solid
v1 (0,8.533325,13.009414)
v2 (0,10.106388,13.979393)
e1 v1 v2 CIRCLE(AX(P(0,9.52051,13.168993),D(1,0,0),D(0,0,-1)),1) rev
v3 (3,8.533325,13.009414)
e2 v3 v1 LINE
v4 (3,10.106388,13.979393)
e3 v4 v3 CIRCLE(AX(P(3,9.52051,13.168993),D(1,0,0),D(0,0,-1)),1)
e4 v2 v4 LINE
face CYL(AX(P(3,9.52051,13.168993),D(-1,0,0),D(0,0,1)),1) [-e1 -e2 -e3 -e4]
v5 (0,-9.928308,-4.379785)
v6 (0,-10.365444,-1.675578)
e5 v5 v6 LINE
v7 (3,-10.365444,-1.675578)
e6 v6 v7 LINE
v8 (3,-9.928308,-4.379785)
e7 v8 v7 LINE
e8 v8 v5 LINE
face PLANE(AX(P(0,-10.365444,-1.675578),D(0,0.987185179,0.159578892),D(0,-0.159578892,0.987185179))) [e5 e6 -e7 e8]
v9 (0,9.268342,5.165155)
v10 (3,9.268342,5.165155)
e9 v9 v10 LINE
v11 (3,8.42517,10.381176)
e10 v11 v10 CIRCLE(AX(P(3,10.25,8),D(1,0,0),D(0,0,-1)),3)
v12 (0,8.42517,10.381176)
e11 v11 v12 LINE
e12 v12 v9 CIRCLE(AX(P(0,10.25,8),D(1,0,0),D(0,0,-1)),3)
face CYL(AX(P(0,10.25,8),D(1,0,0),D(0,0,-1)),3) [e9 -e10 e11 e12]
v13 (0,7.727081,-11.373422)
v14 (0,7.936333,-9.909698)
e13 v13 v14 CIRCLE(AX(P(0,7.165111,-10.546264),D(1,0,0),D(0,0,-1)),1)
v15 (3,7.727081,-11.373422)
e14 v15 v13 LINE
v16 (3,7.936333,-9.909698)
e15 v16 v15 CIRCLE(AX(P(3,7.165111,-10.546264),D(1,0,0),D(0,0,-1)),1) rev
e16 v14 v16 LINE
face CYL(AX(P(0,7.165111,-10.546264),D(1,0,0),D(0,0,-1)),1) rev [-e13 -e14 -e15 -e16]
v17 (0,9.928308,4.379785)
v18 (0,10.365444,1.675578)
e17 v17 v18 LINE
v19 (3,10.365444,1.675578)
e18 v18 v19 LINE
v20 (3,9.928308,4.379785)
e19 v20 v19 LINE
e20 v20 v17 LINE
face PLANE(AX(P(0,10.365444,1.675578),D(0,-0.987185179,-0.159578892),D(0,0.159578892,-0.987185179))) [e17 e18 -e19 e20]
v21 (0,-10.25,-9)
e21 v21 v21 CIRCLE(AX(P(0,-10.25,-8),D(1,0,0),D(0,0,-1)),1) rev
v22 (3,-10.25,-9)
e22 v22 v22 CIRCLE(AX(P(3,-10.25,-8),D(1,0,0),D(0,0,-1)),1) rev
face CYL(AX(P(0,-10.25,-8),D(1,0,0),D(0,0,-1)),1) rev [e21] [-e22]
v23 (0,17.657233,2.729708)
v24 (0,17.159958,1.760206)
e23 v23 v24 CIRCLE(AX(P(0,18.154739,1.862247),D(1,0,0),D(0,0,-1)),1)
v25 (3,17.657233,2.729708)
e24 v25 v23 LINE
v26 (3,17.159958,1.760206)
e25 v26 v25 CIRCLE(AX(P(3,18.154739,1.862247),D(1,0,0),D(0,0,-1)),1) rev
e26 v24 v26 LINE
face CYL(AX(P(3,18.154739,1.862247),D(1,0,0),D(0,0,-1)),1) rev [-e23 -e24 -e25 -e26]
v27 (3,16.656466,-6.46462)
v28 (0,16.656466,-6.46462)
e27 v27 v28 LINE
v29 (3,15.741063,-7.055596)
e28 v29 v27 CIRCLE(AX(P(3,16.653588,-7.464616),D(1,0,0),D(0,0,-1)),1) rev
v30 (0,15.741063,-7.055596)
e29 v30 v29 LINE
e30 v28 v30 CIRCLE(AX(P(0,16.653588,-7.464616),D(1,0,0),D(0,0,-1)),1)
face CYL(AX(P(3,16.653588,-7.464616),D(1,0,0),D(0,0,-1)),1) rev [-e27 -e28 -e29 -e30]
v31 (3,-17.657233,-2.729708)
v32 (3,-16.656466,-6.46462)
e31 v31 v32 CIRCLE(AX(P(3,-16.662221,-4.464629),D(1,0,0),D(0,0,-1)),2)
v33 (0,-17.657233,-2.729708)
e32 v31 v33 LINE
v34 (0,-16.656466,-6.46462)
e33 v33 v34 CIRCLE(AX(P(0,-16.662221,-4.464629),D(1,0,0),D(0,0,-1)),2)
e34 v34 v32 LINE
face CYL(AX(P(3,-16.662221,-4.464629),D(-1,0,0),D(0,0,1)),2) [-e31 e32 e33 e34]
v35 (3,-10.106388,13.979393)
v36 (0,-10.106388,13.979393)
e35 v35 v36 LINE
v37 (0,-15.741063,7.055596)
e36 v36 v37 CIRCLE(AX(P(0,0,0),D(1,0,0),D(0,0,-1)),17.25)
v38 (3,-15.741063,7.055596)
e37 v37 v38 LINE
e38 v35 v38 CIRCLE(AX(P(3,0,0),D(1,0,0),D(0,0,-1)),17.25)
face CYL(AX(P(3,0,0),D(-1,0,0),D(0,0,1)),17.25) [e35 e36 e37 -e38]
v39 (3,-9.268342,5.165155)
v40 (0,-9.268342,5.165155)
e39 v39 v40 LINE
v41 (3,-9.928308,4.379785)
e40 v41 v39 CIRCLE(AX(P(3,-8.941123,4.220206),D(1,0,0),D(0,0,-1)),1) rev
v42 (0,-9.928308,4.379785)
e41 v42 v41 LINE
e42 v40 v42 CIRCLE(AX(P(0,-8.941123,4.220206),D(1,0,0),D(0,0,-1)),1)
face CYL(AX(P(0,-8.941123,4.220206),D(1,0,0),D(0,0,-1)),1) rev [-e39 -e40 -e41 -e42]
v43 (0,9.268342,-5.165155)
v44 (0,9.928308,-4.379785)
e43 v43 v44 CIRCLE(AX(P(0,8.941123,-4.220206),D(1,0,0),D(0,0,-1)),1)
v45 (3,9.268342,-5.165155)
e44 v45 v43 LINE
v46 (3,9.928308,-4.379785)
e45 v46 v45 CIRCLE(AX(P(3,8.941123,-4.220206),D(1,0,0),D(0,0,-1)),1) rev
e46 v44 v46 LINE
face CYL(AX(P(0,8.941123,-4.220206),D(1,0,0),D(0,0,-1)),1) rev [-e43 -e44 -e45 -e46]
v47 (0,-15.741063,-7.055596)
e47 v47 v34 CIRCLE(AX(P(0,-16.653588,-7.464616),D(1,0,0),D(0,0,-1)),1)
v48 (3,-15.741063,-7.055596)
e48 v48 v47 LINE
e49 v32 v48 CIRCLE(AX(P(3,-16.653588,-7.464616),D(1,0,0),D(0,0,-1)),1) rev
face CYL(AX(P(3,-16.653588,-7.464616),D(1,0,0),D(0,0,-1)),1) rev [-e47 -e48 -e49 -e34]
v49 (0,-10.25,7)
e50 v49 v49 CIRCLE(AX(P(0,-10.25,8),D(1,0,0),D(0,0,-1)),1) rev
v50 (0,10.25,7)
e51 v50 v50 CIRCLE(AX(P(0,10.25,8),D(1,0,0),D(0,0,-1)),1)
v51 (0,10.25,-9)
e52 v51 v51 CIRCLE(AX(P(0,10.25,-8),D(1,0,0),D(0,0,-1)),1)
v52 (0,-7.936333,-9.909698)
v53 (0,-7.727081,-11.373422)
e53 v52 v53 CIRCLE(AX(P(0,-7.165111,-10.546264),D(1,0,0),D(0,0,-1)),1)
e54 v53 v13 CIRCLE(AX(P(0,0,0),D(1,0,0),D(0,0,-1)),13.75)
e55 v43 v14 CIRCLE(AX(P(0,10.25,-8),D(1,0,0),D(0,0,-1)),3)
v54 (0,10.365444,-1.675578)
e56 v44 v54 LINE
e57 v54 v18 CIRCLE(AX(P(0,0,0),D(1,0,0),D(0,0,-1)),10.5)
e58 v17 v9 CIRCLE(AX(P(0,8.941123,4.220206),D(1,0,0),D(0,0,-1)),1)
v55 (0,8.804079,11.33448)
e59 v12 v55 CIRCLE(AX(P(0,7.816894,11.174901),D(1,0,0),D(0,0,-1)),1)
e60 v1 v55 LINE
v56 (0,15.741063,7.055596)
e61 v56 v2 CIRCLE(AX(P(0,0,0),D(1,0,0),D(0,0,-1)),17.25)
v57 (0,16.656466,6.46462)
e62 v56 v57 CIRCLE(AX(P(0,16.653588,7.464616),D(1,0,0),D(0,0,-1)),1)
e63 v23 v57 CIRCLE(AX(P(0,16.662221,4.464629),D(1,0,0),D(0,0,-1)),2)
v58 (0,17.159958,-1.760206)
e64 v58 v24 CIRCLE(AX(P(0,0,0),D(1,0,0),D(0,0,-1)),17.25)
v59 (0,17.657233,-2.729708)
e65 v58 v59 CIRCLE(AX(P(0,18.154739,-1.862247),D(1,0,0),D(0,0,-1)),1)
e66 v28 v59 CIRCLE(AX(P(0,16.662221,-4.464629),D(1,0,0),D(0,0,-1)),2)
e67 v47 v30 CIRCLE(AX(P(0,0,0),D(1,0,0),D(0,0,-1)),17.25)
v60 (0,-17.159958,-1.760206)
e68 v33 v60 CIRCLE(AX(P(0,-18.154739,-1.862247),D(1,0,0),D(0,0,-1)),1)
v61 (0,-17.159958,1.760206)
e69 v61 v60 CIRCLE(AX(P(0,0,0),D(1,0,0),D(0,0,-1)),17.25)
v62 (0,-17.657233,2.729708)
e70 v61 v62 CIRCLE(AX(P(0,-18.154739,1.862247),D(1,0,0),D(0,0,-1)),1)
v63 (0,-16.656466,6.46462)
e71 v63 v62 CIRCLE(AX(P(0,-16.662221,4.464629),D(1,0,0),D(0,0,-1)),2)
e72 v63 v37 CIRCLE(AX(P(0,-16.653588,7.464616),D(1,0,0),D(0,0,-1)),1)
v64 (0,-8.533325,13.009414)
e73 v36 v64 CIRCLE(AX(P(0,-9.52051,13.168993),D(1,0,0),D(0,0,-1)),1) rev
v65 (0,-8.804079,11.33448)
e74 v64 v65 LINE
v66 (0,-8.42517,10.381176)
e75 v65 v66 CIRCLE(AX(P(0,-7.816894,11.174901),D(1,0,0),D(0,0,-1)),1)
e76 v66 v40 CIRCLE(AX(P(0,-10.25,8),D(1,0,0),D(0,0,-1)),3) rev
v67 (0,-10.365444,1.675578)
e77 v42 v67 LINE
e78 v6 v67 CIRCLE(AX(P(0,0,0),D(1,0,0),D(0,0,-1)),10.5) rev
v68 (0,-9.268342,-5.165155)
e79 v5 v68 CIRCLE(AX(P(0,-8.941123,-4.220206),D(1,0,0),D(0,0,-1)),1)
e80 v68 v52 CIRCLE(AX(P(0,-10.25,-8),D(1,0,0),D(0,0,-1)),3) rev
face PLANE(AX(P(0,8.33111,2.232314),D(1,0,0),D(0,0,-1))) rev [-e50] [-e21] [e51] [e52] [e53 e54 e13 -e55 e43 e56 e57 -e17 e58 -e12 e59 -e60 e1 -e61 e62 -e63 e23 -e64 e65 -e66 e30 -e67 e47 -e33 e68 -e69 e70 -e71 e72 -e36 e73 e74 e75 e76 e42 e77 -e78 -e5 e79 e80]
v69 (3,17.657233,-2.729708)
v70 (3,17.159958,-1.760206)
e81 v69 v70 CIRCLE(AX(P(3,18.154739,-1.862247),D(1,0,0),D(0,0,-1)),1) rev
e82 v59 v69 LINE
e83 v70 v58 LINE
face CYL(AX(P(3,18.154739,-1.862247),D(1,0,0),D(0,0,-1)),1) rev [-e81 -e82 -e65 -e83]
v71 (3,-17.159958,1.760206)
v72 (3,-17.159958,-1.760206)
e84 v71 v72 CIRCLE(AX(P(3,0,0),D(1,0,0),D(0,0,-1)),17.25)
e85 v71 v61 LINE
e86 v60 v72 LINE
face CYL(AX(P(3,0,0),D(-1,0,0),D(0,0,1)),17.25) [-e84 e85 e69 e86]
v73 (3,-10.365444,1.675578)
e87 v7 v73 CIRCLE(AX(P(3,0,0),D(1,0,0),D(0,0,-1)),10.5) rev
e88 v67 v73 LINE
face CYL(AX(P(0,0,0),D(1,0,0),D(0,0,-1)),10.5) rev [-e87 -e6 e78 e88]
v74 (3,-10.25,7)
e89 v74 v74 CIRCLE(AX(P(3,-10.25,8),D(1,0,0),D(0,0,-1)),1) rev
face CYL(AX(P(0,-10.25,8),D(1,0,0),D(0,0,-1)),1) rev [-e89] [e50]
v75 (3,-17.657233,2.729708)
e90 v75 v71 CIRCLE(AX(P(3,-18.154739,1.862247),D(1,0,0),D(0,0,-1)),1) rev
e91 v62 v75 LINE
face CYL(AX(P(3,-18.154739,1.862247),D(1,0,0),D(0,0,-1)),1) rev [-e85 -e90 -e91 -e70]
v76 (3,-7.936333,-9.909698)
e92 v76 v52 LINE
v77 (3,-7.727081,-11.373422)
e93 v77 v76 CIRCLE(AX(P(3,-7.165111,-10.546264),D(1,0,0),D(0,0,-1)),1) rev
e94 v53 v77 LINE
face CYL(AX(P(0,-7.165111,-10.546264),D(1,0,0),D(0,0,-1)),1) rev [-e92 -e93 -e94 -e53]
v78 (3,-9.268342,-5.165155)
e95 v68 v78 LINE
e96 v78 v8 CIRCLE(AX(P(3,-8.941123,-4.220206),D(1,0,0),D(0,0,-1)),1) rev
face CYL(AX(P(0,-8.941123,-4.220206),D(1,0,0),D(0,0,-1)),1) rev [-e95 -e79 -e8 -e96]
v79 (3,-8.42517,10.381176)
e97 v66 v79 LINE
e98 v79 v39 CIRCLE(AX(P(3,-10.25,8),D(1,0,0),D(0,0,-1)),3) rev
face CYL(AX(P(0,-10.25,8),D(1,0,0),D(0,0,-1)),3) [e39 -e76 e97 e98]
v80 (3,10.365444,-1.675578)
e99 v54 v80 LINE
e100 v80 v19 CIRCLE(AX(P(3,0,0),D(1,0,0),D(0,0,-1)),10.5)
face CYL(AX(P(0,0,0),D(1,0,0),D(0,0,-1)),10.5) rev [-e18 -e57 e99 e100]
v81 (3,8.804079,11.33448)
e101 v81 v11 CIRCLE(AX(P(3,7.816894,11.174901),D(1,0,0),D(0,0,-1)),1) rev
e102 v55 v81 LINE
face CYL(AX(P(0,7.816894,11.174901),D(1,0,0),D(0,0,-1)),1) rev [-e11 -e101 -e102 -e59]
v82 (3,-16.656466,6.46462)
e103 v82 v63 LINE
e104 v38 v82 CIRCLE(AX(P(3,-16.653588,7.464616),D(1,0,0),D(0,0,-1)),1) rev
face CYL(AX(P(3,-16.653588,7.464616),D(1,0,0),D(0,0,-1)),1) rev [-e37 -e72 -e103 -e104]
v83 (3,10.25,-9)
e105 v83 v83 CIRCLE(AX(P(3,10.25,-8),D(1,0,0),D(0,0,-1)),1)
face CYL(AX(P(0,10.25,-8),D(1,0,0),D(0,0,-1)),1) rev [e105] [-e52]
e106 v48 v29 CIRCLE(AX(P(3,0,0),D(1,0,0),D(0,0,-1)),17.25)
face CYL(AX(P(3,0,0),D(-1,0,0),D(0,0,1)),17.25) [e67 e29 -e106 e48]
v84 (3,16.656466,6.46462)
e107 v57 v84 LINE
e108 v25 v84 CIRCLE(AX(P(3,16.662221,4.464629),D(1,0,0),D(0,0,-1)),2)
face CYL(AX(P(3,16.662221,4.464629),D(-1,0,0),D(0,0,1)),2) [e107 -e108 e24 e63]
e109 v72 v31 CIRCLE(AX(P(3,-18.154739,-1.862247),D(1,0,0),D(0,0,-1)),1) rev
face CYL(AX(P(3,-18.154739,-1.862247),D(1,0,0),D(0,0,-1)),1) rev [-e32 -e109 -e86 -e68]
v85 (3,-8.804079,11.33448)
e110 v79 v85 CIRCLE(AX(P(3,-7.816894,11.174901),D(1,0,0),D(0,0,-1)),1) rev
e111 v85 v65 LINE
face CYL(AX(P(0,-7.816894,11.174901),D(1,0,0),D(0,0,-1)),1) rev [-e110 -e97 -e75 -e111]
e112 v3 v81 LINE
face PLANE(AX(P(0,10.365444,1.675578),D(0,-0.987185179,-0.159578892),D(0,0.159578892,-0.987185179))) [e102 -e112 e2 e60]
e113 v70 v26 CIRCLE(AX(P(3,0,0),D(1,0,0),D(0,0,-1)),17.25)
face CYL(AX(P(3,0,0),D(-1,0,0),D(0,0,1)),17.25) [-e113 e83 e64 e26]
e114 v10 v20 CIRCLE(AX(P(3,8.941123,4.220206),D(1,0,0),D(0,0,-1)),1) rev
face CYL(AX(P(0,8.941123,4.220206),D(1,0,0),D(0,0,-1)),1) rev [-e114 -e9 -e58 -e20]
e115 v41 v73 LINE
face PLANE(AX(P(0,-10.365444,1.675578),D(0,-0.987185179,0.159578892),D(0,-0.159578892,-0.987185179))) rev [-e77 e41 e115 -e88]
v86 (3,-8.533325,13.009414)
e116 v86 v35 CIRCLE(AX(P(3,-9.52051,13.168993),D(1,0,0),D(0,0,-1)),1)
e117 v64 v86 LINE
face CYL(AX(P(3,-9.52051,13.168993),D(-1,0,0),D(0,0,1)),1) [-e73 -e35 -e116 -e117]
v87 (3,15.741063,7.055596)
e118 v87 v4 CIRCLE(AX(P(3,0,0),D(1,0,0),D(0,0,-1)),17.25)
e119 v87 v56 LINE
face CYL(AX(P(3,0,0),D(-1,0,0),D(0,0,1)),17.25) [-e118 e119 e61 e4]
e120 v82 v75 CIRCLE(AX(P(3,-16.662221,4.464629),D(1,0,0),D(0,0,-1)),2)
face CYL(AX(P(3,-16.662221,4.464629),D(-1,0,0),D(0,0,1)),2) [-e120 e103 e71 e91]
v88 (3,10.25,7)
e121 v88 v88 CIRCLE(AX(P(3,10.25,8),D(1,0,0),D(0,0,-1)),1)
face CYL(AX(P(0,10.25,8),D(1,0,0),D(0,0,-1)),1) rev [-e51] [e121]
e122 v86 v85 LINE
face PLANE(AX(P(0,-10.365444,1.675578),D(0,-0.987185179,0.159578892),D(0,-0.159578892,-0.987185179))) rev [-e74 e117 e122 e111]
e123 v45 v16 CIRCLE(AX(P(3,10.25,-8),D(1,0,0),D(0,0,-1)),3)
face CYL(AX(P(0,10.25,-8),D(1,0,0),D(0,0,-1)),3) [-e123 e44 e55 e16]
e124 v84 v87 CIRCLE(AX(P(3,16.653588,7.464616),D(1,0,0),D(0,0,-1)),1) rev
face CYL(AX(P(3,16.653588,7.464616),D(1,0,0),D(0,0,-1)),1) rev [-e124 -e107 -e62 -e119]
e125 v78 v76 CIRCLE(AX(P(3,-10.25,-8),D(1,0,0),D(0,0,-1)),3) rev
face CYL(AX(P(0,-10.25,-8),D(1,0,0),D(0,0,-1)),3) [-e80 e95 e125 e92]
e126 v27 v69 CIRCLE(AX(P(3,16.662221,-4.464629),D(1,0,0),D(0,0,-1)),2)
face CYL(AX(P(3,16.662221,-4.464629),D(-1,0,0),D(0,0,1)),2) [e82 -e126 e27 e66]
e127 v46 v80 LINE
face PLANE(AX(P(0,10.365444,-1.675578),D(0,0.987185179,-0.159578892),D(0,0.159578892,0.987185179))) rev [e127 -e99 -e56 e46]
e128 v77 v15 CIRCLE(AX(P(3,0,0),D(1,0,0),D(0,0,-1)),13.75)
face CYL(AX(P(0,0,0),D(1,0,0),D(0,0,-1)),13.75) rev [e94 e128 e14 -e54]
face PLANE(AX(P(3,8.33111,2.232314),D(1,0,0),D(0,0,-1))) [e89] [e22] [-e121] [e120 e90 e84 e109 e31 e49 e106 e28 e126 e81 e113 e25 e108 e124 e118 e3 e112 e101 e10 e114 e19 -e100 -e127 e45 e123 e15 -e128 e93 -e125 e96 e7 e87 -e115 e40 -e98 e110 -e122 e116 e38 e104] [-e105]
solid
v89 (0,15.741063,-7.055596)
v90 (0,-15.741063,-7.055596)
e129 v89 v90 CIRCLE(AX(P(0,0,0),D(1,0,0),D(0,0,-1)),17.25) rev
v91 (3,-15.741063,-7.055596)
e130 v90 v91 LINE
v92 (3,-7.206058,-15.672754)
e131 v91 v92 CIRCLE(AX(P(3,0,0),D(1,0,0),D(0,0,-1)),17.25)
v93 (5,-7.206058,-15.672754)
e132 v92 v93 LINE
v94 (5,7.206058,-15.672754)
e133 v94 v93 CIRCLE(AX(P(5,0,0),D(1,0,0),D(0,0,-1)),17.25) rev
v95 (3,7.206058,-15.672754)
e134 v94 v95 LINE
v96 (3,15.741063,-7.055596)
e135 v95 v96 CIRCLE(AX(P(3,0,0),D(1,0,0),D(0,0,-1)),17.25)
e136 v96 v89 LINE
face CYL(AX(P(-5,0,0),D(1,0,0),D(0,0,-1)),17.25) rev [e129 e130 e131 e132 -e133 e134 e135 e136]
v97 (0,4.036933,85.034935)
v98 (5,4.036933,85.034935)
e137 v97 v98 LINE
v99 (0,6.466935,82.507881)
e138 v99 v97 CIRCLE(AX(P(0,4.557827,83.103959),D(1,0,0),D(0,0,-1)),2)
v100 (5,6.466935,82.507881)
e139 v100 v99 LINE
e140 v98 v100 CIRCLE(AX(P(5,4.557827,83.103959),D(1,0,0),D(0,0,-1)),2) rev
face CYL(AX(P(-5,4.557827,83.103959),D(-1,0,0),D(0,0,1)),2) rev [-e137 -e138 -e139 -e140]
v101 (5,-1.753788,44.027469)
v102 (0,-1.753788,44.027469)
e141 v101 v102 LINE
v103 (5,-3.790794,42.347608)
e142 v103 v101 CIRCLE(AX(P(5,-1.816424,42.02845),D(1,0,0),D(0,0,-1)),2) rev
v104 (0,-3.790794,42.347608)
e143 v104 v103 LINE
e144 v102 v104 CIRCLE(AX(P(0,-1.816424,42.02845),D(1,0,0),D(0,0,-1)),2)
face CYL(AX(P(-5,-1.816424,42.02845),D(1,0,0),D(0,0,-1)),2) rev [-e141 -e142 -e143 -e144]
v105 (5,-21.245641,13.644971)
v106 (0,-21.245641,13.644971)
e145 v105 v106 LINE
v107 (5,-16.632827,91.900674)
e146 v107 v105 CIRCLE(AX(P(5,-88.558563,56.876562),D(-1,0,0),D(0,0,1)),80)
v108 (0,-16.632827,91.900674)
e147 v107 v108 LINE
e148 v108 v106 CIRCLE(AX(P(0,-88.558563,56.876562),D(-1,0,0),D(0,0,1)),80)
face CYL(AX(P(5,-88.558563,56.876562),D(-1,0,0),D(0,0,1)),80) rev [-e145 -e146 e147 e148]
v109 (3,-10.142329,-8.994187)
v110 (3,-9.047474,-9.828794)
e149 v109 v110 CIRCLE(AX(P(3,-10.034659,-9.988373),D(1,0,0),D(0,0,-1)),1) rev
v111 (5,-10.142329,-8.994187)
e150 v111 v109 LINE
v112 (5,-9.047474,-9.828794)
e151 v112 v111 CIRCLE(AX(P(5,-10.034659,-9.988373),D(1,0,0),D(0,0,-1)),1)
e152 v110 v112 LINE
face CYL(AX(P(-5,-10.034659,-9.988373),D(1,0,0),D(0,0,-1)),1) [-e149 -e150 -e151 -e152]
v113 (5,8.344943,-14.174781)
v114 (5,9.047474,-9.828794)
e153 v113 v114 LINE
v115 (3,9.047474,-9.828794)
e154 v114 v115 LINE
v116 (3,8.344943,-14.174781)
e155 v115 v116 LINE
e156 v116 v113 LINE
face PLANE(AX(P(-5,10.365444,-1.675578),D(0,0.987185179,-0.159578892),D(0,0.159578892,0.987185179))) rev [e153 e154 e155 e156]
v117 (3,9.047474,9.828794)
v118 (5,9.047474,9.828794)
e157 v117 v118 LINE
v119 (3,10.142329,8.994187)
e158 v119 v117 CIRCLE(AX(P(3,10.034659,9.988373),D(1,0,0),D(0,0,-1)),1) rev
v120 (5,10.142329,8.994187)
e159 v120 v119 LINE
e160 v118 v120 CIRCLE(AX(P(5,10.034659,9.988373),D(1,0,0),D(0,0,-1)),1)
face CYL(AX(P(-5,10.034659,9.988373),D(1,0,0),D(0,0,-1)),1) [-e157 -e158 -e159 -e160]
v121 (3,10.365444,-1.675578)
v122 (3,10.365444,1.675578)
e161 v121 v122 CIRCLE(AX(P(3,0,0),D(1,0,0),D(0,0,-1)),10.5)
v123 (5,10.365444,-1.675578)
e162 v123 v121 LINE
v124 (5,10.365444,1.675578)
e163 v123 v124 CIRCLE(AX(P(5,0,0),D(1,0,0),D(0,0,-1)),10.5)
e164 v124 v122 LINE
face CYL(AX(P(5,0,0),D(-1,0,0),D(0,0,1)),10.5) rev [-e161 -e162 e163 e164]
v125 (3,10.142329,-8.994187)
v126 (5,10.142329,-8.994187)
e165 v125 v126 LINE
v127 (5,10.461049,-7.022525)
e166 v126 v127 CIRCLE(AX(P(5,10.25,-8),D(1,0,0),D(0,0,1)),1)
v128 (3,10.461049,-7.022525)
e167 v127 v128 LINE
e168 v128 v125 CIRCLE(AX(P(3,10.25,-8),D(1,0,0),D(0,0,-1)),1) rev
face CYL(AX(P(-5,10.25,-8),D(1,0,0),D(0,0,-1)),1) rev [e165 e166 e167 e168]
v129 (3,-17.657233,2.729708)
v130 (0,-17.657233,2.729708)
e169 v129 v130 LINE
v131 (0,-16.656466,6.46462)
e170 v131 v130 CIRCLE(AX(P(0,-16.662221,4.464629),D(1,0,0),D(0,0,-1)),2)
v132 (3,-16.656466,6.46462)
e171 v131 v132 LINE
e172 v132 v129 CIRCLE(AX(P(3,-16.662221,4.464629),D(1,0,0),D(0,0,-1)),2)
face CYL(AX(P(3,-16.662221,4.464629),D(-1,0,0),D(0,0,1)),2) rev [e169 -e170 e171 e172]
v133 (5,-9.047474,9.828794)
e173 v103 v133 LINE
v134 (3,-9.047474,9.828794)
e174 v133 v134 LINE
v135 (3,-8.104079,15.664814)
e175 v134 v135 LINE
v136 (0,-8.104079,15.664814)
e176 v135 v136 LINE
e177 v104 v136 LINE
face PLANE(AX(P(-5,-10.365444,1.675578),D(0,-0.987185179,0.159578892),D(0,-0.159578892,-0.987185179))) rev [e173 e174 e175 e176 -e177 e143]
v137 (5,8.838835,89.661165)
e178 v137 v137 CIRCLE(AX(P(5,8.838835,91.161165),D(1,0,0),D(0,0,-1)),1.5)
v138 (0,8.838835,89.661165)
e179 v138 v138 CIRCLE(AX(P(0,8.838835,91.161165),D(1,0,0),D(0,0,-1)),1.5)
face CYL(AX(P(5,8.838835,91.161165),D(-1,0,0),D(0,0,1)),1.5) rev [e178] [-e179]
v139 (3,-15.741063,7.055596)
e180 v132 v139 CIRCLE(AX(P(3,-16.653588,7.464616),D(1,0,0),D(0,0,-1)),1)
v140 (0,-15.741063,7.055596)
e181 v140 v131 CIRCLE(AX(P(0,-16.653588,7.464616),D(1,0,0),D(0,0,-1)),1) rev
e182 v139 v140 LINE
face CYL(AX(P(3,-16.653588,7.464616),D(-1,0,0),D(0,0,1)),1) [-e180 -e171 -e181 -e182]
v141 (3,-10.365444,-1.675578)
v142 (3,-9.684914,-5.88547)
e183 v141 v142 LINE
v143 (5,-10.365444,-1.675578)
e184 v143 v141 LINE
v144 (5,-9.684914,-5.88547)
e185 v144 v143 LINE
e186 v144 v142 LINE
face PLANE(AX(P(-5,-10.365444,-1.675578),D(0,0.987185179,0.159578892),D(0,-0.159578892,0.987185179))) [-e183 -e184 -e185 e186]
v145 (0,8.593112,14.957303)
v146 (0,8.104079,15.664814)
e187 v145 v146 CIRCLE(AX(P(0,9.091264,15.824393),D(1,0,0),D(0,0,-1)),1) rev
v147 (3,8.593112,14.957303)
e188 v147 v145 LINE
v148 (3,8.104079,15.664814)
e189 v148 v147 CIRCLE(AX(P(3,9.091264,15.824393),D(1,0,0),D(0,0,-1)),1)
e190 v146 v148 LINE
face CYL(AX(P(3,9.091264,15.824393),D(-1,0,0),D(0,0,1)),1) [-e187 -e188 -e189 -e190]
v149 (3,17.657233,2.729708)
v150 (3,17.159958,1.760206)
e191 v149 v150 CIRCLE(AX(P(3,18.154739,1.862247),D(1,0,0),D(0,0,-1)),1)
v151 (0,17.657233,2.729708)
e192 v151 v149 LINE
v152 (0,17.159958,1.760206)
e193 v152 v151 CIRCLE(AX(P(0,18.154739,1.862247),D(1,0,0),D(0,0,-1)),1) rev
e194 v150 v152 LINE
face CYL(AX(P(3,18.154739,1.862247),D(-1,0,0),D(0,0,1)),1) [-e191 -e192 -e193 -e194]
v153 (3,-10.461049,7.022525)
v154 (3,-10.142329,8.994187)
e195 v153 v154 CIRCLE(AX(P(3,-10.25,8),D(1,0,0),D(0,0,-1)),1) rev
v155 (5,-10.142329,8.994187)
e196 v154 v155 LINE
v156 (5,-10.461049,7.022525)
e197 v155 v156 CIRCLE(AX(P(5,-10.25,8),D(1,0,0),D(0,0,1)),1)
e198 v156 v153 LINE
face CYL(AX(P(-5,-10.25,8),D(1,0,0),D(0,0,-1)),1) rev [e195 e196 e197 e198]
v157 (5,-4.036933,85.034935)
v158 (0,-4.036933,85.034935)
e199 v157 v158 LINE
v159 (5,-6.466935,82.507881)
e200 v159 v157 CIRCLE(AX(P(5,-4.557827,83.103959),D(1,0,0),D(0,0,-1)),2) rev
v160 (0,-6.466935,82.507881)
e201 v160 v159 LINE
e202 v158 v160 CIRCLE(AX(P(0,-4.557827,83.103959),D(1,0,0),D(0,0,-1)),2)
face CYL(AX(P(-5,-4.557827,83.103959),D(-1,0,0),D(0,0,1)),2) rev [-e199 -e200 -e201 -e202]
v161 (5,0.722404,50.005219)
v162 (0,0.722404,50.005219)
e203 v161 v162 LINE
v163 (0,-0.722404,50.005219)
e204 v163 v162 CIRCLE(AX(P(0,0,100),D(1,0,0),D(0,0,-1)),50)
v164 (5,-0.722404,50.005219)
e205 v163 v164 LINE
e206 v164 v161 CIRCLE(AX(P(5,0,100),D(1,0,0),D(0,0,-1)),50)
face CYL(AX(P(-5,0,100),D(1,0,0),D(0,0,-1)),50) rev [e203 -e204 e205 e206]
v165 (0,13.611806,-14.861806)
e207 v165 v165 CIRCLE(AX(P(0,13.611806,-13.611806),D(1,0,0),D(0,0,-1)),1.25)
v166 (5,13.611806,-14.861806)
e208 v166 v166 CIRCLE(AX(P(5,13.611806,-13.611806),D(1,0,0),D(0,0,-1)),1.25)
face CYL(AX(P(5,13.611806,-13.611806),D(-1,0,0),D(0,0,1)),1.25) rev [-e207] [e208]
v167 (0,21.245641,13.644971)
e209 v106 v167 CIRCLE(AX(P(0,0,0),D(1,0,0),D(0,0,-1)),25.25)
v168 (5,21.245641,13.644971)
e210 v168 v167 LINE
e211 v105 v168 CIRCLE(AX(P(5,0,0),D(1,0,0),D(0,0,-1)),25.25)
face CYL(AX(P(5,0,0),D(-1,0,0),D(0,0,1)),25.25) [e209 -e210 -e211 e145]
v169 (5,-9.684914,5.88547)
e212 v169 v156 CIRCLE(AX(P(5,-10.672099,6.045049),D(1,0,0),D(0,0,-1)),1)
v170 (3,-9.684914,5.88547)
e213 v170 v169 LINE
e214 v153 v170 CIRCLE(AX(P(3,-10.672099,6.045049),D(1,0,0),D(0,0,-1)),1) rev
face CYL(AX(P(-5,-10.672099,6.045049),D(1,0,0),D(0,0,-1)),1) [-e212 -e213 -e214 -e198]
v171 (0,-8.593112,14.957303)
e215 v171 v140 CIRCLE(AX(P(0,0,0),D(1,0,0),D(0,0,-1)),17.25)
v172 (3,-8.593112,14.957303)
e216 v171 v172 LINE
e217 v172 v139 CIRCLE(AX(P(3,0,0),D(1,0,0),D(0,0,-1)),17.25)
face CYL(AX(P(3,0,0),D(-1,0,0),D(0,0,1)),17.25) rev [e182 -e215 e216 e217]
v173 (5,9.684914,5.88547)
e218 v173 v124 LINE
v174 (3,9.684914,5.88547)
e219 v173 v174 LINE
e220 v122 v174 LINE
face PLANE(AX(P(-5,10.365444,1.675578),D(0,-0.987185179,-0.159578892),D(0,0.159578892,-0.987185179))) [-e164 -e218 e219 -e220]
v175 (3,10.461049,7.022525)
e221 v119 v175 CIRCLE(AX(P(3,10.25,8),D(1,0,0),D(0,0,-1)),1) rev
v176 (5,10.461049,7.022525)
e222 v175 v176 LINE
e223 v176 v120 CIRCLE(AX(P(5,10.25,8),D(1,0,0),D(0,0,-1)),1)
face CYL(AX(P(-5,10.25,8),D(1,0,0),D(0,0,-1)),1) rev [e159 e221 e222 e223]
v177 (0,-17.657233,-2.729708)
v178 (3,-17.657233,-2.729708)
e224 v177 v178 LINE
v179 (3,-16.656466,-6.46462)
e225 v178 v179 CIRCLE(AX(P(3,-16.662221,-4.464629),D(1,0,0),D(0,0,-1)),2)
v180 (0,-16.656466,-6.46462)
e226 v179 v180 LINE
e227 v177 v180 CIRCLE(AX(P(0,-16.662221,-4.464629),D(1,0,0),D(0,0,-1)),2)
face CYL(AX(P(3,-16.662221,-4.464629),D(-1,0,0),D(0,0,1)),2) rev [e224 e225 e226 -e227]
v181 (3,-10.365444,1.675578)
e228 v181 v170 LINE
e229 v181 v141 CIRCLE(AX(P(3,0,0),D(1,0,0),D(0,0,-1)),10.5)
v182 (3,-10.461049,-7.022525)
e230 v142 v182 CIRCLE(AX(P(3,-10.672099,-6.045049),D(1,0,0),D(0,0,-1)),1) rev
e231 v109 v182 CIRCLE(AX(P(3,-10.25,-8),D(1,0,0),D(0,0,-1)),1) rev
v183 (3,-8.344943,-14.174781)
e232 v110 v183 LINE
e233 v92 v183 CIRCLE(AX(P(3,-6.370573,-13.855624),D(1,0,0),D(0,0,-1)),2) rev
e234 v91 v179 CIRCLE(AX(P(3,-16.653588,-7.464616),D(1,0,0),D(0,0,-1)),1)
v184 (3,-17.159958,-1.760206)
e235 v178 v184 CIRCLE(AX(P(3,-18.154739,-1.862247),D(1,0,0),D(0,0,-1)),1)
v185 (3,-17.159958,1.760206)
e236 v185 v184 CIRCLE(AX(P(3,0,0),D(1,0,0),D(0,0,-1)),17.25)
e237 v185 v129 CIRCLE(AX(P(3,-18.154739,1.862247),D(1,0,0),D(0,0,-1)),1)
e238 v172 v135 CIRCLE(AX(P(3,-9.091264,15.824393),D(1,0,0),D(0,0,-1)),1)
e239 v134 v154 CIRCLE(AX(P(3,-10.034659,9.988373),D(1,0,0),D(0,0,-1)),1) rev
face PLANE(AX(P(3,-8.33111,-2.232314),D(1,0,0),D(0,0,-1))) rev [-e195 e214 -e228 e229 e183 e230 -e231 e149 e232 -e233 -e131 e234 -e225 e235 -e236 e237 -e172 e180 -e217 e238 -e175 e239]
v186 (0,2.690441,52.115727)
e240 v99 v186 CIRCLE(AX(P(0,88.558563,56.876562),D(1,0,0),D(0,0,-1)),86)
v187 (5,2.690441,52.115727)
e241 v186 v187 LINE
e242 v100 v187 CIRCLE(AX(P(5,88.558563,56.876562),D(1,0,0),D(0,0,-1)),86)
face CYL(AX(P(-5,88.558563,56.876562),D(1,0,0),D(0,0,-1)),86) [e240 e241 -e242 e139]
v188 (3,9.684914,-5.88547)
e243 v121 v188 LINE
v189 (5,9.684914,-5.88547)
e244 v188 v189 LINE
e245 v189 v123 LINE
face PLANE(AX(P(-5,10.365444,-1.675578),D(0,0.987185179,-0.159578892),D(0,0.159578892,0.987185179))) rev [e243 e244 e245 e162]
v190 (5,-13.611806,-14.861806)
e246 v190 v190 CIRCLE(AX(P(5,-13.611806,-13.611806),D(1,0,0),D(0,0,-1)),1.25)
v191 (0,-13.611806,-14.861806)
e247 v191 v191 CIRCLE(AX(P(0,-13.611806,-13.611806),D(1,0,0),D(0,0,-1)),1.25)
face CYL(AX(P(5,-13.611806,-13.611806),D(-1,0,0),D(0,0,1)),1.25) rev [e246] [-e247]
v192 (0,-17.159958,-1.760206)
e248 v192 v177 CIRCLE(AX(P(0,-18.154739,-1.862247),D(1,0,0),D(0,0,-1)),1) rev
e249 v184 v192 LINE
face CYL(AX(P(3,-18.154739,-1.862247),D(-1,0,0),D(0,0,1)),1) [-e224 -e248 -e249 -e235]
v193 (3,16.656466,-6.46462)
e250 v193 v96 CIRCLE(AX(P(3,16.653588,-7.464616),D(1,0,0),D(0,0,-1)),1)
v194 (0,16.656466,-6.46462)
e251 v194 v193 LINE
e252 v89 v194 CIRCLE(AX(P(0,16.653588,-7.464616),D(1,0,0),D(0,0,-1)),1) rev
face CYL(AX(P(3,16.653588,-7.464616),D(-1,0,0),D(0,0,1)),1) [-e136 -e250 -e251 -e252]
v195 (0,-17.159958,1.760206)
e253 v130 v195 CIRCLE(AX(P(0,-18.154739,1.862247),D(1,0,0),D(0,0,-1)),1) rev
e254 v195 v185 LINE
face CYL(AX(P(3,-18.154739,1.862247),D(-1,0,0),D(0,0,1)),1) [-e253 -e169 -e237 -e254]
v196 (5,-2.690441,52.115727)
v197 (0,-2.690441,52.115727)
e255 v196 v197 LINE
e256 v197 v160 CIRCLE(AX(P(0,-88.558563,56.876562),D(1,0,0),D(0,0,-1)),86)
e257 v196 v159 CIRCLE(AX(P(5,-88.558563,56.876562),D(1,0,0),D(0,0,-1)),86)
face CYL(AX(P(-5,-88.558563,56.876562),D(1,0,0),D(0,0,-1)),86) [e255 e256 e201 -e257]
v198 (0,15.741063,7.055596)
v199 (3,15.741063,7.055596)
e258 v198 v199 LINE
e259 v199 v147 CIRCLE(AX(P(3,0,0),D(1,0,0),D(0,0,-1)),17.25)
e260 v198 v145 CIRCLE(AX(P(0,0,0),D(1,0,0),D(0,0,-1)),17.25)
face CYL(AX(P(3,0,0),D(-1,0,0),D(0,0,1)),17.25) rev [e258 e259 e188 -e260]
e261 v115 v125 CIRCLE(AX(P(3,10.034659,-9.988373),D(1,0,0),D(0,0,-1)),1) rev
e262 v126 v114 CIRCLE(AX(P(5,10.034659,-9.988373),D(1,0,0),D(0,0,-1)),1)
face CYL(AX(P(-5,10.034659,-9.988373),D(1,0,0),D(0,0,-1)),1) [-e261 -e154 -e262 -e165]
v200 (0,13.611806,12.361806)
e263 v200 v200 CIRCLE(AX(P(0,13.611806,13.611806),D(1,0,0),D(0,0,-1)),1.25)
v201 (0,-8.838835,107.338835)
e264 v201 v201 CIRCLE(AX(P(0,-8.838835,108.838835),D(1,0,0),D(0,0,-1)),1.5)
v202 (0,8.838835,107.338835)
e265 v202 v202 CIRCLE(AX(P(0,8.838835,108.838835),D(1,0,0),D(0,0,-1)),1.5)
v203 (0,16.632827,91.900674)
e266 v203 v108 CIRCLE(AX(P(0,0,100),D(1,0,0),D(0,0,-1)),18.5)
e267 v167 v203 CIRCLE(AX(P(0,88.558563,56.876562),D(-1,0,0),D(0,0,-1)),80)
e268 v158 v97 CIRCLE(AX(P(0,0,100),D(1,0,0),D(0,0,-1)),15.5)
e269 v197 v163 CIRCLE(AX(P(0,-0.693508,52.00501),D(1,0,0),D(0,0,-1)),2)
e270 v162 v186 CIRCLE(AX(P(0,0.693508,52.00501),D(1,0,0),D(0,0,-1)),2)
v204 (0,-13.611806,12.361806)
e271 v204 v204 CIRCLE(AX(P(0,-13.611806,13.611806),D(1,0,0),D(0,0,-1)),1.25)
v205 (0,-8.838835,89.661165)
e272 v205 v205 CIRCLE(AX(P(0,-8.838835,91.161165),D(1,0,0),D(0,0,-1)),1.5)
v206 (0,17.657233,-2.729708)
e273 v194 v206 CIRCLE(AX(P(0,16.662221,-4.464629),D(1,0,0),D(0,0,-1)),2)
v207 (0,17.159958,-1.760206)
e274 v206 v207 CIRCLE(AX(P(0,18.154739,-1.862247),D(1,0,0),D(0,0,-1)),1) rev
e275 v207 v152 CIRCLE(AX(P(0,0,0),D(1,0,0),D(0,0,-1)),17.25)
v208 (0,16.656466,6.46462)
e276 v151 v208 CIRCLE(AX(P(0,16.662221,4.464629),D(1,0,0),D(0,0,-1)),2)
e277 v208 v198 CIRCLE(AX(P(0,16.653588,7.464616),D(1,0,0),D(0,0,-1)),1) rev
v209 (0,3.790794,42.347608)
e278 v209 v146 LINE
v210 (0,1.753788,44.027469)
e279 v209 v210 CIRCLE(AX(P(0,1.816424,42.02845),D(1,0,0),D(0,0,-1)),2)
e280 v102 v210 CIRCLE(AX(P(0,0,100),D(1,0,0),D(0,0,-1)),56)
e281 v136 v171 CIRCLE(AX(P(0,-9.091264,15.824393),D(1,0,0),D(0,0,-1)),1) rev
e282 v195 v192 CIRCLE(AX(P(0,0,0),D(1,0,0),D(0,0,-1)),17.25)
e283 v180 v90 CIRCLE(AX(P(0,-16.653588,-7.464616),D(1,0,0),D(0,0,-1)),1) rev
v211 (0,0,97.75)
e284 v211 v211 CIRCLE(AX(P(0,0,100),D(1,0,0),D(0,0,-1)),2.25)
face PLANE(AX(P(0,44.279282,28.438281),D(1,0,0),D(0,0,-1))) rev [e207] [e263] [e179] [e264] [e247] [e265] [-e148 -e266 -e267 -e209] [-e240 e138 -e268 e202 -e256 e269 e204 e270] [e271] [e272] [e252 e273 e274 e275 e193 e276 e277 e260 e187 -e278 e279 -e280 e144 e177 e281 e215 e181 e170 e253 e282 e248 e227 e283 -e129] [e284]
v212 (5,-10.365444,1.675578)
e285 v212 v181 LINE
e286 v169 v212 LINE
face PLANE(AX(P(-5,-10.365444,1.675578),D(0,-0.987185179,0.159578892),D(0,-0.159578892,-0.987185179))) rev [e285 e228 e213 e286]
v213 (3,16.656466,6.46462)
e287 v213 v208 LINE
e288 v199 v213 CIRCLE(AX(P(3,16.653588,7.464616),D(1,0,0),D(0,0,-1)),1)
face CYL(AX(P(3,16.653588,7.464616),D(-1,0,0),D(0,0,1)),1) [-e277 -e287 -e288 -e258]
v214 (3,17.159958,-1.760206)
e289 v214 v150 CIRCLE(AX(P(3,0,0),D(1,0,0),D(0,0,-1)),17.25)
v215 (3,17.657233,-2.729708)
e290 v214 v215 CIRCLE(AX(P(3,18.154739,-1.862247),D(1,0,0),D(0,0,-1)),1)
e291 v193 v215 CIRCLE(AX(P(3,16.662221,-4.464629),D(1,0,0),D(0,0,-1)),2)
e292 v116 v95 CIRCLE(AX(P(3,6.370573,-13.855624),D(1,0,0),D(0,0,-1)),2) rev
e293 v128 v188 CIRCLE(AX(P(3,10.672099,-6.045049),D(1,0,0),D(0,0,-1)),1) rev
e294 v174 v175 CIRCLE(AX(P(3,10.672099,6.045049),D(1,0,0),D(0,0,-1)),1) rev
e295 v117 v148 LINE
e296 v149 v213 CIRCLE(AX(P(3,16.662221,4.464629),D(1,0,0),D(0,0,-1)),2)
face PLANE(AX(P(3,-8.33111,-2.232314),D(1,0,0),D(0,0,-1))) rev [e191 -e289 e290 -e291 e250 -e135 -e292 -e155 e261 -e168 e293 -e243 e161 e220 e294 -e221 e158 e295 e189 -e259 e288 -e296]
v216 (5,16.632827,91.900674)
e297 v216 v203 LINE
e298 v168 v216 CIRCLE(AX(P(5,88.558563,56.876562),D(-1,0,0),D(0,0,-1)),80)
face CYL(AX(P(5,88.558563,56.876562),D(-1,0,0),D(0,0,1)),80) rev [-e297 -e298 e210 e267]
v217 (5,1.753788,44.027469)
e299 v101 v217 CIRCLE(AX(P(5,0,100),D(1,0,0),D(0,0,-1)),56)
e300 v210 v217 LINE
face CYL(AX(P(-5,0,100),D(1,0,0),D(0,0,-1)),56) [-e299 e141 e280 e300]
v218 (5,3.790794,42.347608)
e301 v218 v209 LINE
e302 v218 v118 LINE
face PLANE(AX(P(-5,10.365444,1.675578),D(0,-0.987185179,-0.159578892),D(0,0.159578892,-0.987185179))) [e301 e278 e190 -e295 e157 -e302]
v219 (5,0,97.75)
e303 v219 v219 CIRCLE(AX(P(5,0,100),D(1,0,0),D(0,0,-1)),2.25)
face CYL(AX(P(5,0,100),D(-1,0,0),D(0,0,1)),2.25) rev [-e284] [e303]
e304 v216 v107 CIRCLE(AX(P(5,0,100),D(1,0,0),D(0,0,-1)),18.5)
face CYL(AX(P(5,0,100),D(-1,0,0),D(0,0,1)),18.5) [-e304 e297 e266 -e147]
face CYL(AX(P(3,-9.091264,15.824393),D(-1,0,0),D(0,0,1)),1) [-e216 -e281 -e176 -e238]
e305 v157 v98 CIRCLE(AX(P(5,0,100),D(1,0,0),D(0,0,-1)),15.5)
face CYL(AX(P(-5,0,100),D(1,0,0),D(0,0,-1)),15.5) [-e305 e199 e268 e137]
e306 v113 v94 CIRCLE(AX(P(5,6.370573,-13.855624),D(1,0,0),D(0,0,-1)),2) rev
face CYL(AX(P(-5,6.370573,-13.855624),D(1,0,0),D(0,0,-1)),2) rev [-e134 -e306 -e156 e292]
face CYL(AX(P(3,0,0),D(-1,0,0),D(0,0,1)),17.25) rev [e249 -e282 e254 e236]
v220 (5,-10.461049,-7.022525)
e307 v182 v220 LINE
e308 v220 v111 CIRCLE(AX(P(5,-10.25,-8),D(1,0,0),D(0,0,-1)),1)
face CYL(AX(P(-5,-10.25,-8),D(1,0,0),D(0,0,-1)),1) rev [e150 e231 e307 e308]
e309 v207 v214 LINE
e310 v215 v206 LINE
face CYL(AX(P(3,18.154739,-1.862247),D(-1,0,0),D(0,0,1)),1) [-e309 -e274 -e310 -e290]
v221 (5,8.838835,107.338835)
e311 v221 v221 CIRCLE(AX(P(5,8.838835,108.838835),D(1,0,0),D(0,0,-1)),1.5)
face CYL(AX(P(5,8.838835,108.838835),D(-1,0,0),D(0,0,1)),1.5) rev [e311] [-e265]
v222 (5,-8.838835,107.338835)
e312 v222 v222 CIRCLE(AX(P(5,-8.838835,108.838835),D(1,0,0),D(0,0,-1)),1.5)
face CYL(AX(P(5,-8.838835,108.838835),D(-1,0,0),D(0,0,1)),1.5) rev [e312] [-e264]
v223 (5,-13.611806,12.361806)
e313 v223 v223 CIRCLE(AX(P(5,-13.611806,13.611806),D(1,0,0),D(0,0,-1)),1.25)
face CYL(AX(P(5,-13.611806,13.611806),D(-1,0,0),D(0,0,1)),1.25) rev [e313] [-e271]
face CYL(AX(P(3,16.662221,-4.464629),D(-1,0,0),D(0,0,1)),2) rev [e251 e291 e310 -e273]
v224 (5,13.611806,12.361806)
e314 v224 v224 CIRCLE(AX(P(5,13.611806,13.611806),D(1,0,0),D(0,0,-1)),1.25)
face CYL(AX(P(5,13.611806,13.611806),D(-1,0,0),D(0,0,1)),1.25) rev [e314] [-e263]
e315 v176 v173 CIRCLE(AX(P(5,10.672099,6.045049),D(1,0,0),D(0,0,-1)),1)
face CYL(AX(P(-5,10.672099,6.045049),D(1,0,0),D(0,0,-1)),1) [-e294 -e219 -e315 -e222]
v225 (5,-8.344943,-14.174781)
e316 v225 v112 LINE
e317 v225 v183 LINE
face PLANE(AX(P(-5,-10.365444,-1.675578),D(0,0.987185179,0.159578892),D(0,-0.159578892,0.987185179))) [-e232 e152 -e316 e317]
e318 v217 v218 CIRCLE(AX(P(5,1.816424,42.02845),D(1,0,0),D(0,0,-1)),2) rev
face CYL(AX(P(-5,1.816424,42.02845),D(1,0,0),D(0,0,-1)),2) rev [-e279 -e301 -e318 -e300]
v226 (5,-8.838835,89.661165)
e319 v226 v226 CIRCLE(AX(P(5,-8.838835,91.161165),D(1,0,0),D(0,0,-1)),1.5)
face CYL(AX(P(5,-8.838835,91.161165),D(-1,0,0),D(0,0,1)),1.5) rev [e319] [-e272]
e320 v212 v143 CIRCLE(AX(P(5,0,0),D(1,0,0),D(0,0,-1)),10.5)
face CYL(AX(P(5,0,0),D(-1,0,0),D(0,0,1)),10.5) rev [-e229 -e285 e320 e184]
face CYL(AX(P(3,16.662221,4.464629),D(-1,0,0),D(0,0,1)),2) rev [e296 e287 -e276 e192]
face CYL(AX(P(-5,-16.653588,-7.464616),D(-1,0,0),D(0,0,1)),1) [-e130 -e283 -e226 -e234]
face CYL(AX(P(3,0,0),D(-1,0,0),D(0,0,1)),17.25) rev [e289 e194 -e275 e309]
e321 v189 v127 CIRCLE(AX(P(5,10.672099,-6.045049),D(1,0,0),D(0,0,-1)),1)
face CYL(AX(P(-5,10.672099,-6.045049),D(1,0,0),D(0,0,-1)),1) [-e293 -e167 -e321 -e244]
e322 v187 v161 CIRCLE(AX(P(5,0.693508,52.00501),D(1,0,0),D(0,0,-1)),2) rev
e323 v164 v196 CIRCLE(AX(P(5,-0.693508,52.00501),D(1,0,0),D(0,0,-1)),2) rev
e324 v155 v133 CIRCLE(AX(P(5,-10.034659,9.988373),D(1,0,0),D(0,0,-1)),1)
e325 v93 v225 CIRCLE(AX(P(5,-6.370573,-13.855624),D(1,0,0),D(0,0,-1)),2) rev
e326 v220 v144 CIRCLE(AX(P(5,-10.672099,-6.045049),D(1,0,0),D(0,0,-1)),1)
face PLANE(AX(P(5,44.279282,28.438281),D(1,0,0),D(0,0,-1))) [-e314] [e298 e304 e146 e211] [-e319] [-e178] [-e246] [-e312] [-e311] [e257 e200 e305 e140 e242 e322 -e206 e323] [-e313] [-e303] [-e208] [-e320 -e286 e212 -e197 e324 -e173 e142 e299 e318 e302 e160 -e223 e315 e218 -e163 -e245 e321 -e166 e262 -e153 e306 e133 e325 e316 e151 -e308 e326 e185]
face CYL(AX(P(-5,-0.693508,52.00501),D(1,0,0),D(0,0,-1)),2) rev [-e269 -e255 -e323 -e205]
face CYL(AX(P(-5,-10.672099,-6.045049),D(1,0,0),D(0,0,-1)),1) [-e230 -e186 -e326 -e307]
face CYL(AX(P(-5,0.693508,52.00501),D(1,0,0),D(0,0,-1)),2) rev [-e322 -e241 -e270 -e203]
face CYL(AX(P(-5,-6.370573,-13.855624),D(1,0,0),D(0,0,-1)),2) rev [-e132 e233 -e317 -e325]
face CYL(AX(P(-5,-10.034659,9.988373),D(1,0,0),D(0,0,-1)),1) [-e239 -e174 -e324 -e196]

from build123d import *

# Parameters (mm, degrees)
SKETCH_1_R              = 1.25
SKETCH_1_R_2            = 1.5
SKETCH_1_R_3            = 2.25
SKETCH_1_R_4            = 10.5
EXTRUDE_1_DEPTH         = 5
CUT_EXTRUDE_START       = -10
CUT_EXTRUDE_1_DEPTH     = 10
FILLET_1_R              = 2
SKETCH_3_R              = 1
CUT_EXTRUDE_2_DEPTH     = 10
FILLET_2_R              = 1
CUT_EXTRUDE_4_DEPTH     = 3
EXTRUDE_2_DEPTH         = 3
CUT_EXTRUDE_START_2     = -3
CUT_EXTRUDE_5_OUTLINE_R = 1
CUT_EXTRUDE_5_DEPTH     = 3
FILLET_3_R              = 1
FILLET_4_R              = 1


with BuildPart() as part:
    # 草图1 → 凸台-拉伸1 (new body)
    with BuildSketch(Plane(origin=(0, 0, 0), x_dir=(0, 0, -1), z_dir=(1, 0, 0))):
        with BuildLine():
            ThreePointArc((-13.644971051, -21.245641083), (25.25, 0), (-13.644971051, 21.245641083))
            ThreePointArc((-13.644971051, 21.245641083), (-52.169100828, 8.697184645), (-91.900674175, 16.632826614))
            ThreePointArc((-91.900674175, 16.632826614), (-118.5, 0), (-91.900674175, -16.632826614))
            ThreePointArc((-91.900674175, -16.632826614), (-52.169100828, -8.697184645), (-13.644971051, -21.245641083))
        make_face()
        with Locations((13.611805538, 13.611805538)):
            Circle(SKETCH_1_R, mode=Mode.SUBTRACT)
        with Locations((-108.838834765, 8.838834765)):
            Circle(SKETCH_1_R_2, mode=Mode.SUBTRACT)
        with Locations((13.611805538, -13.611805538)):
            Circle(SKETCH_1_R, mode=Mode.SUBTRACT)
        with Locations((-13.611805538, -13.611805538)):
            Circle(SKETCH_1_R, mode=Mode.SUBTRACT)
        with Locations((-13.611805538, 13.611805538)):
            Circle(SKETCH_1_R, mode=Mode.SUBTRACT)
        with Locations((-91.161165235, 8.838834765)):
            Circle(SKETCH_1_R_2, mode=Mode.SUBTRACT)
        with Locations((-91.161165235, -8.838834765)):
            Circle(SKETCH_1_R_2, mode=Mode.SUBTRACT)
        with Locations((-108.838834765, -8.838834765)):
            Circle(SKETCH_1_R_2, mode=Mode.SUBTRACT)
        with Locations((-100, 0)):
            Circle(SKETCH_1_R_3, mode=Mode.SUBTRACT)
        Circle(SKETCH_1_R_4, mode=Mode.SUBTRACT)
    extrude(amount=EXTRUDE_1_DEPTH)

    # 草图2 → 切除-拉伸1 (cut)
    with BuildSketch(Plane(origin=(5, 0, 0), x_dir=(0, 0, -1), z_dir=(1, 0, 0)).offset(CUT_EXTRUDE_START)):
        with BuildLine():
            Line((-1.675578367, 10.365444377), (-43.152777776, 3.660637951))
            ThreePointArc((-43.152777776, 3.660637951), (-43.631277256, 3.584670753), (-44.110197111, 3.51140044))
            ThreePointArc((-44.110197111, 3.51140044), (-44, 0), (-44.110197111, -3.51140044))
            ThreePointArc((-44.110197111, -3.51140044), (-43.631277256, -3.584670753), (-43.152777776, -3.660637951))
            Line((-43.152777776, -3.660637951), (-1.675578367, -10.365444377))
            ThreePointArc((-1.675578367, -10.365444377), (-10.5, 0), (-1.675578367, 10.365444377))
        make_face()
        with BuildLine():
            ThreePointArc((-50.080014318, -2.827548326), (-50, 0), (-50.080014318, 2.827548326))
            ThreePointArc((-50.080014318, 2.827548326), (-68.639565024, 3.366827977), (-86.650810078, 7.877126915))
            ThreePointArc((-86.650810078, 7.877126915), (-84.5, 0), (-86.650810078, -7.877126915))
            ThreePointArc((-86.650810078, -7.877126915), (-68.639565024, -3.366827977), (-50.080014318, -2.827548326))
        make_face()
        with BuildLine():
            Line((1.675578367, -10.365444377), (15.186407653, -8.181413239))
            ThreePointArc((15.186407653, -8.181413239), (17.25, 0), (15.186407653, 8.181413239))
            Line((15.186407653, 8.181413239), (1.675578367, 10.365444377))
            ThreePointArc((1.675578367, 10.365444377), (10.5, 0), (1.675578367, -10.365444377))
        make_face()
    extrude(amount=CUT_EXTRUDE_1_DEPTH, mode=Mode.SUBTRACT)

    # 圆角1
    fillet_1_edges = [part.edges().sort_by_distance(p)[0] for p in [
        (2.5, -7.877126915, 86.650810078),
        (2.5, 8.181413239, -15.186407653),
        (2.5, -8.181413239, -15.186407653),
        (2.5, 7.877126915, 86.650810078),
        (2.5, 2.827548326, 50.080014318),
        (2.5, -2.827548326, 50.080014318),
        (2.5, 3.51140044, 44.110197111),
        (2.5, -3.51140044, 44.110197111),
    ]]
    fillet(fillet_1_edges, radius=FILLET_1_R)

    # 草图3 → 切除-拉伸2 (cut)
    with BuildSketch(Plane(origin=(5, 0, 0), x_dir=(0, 0, -1), z_dir=(1, 0, 0))):
        with Locations((-8, 10.25)):
            Circle(SKETCH_3_R)
        with Locations((-8, -10.25)):
            Circle(SKETCH_3_R)
        with Locations((8, -10.25)):
            Circle(SKETCH_3_R)
        with Locations((8, 10.25)):
            Circle(SKETCH_3_R)
    extrude(amount=-CUT_EXTRUDE_2_DEPTH, mode=Mode.SUBTRACT)

    # 圆角2
    fillet_2_edges = [part.edges().sort_by_distance(p)[0] for p in [
        (2.5, 9.295100355, -8.296928726),
        (2.5, 9.437286892, -7.417335942),
        (2.5, -9.295100355, -8.296928726),
        (2.5, -9.437286892, -7.417335942),
        (2.5, -9.295100355, 8.296928726),
        (2.5, -9.437286892, 7.417335942),
        (2.5, 9.295100355, 8.296928726),
        (2.5, 9.437286892, 7.417335942),
    ]]
    fillet(fillet_2_edges, radius=FILLET_2_R)

    # 草图4 → 切除-拉伸4 (cut)
    with BuildSketch(Plane(origin=(0, 0, 0), x_dir=(0, 0, -1), z_dir=(1, 0, 0))):
        with BuildLine():
            ThreePointArc((-6.363223316, 16.033461542), (-17.25, 0), (-6.363223316, -16.033461542))
            ThreePointArc((-6.363223316, -16.033461542), (-4.982266618, -18.594072156), (-2.50601773, -17.066996664))
            ThreePointArc((-2.50601773, -17.066996664), (0, -17.25), (2.50601773, -17.066996664))
            ThreePointArc((2.50601773, -17.066996664), (4.982266618, -18.594072156), (6.363223316, -16.033461542))
            ThreePointArc((6.363223316, -16.033461542), (17.25, 0), (6.363223316, 16.033461542))
            ThreePointArc((6.363223316, 16.033461542), (4.982266618, 18.594072156), (2.50601773, 17.066996664))
            ThreePointArc((2.50601773, 17.066996664), (0, 17.25), (-2.50601773, 17.066996664))
            ThreePointArc((-2.50601773, 17.066996664), (-4.982266618, 18.594072156), (-6.363223316, 16.033461542))
        make_face()
    extrude(amount=CUT_EXTRUDE_4_DEPTH, mode=Mode.SUBTRACT)

    # 圆角3
    fillet_3_edges = [part.edges().sort_by_distance(p)[0] for p in [
        (1.5, -8.181413239, 15.186407653),
        (1.5, -16.033461542, -6.363223316),
        (1.5, -17.066996664, -2.50601773),
        (1.5, 16.033461542, -6.363223316),
        (1.5, 17.066996664, -2.50601773),
        (1.5, 17.066996664, 2.50601773),
        (1.5, 8.181413239, 15.186407653),
        (1.5, 16.033461542, 6.363223316),
        (1.5, -16.033461542, 6.363223316),
        (1.5, -17.066996664, 2.50601773),
    ]]
    fillet(fillet_3_edges, radius=FILLET_3_R)


with BuildPart() as body_2:
    # 草图4<2> → 凸台-拉伸2 (new body)
    with BuildSketch(Plane(origin=(0, 0, 0), x_dir=(0, 0, -1), z_dir=(1, 0, 0))):
        with BuildLine():
            ThreePointArc((-6.363223316, 16.033461542), (-17.25, 0), (-6.363223316, -16.033461542))
            ThreePointArc((-6.363223316, -16.033461542), (-4.982266618, -18.594072156), (-2.50601773, -17.066996664))
            ThreePointArc((-2.50601773, -17.066996664), (0, -17.25), (2.50601773, -17.066996664))
            ThreePointArc((2.50601773, -17.066996664), (4.982266618, -18.594072156), (6.363223316, -16.033461542))
            ThreePointArc((6.363223316, -16.033461542), (17.25, 0), (6.363223316, 16.033461542))
            ThreePointArc((6.363223316, 16.033461542), (4.982266618, 18.594072156), (2.50601773, 17.066996664))
            ThreePointArc((2.50601773, 17.066996664), (0, 17.25), (-2.50601773, 17.066996664))
            ThreePointArc((-2.50601773, 17.066996664), (-4.982266618, 18.594072156), (-6.363223316, 16.033461542))
        make_face()
    extrude(amount=EXTRUDE_2_DEPTH)

    # 切除-拉伸5: read off the stored shape, not the designer's step
    # 切除-拉伸5 outline → 切除-拉伸5 (cut)
    with BuildSketch(Plane(origin=(3, 0, 0), x_dir=(0, 0, -1), z_dir=(1, 0, 0)).offset(CUT_EXTRUDE_START_2)):
        with BuildLine():
            Line((-5.030527041, -9.823115537), (-1.675578367, -10.365444377))
            ThreePointArc((-1.675578367, -10.365444377), (0, -10.5), (1.675578367, -10.365444377))
            Line((1.675578367, -10.365444377), (5.030527041, -9.823115537))
            ThreePointArc((5.030527041, -9.823115537), (7.435663826, -7.303557283), (10.601579495, -8.756084296))
            ThreePointArc((10.601579495, -8.756084296), (13.75, 0), (10.601579495, 8.756084296))
            ThreePointArc((10.601579495, 8.756084296), (7.435663826, 7.303557283), (5.030527041, 9.823115537))
            Line((5.030527041, 9.823115537), (1.675578367, 10.365444377))
            ThreePointArc((1.675578367, 10.365444377), (0, 10.5), (-1.675578367, 10.365444377))
            Line((-1.675578367, 10.365444377), (-5.030527041, 9.823115537))
            ThreePointArc((-5.030527041, 9.823115537), (-7.521263324, 7.288444464), (-10.683737627, 8.90927171))
            Line((-10.683737627, 8.90927171), (-15.186407653, 8.181413239))
            ThreePointArc((-15.186407653, 8.181413239), (-17.25, 0), (-15.186407653, -8.181413239))
            Line((-15.186407653, -8.181413239), (-10.683737627, -8.90927171))
            ThreePointArc((-10.683737627, -8.90927171), (-7.521263324, -7.288444464), (-5.030527041, -9.823115537))
        make_face()
        with Locations((-8, -10.25)):
            Circle(CUT_EXTRUDE_5_OUTLINE_R)
        with Locations((8, -10.25)):
            Circle(CUT_EXTRUDE_5_OUTLINE_R)
        with Locations((8, 10.25)):
            Circle(CUT_EXTRUDE_5_OUTLINE_R)
        with Locations((-8, 10.25)):
            Circle(CUT_EXTRUDE_5_OUTLINE_R)
    extrude(amount=CUT_EXTRUDE_5_DEPTH, mode=Mode.SUBTRACT)

    # 圆角4
    fillet_4_edges = [body_2.edges().sort_by_distance(p)[0] for p in [
        (1.5, 17.066996664, -2.50601773),
        (1.5, 16.033461542, -6.363223316),
        (1.5, -16.033461542, -6.363223316),
        (1.5, -17.066996664, -2.50601773),
        (1.5, -17.066996664, 2.50601773),
        (1.5, -16.033461542, 6.363223316),
        (1.5, 16.033461542, 6.363223316),
        (1.5, 17.066996664, 2.50601773),
        (1.5, -9.823115537, 5.030527041),
        (1.5, -8.90927171, 10.683737627),
        (1.5, -8.181413239, 15.186407653),
        (1.5, 8.181413239, 15.186407653),
        (1.5, 8.90927171, 10.683737627),
        (1.5, 9.823115537, 5.030527041),
        (1.5, 9.823115537, -5.030527041),
        (1.5, 8.756084296, -10.601579495),
        (1.5, -8.756084296, -10.601579495),
        (1.5, -9.823115537, -5.030527041),
    ]]
    fillet(fillet_4_edges, radius=FILLET_4_R)


solid = Compound([part.part, body_2.part])
